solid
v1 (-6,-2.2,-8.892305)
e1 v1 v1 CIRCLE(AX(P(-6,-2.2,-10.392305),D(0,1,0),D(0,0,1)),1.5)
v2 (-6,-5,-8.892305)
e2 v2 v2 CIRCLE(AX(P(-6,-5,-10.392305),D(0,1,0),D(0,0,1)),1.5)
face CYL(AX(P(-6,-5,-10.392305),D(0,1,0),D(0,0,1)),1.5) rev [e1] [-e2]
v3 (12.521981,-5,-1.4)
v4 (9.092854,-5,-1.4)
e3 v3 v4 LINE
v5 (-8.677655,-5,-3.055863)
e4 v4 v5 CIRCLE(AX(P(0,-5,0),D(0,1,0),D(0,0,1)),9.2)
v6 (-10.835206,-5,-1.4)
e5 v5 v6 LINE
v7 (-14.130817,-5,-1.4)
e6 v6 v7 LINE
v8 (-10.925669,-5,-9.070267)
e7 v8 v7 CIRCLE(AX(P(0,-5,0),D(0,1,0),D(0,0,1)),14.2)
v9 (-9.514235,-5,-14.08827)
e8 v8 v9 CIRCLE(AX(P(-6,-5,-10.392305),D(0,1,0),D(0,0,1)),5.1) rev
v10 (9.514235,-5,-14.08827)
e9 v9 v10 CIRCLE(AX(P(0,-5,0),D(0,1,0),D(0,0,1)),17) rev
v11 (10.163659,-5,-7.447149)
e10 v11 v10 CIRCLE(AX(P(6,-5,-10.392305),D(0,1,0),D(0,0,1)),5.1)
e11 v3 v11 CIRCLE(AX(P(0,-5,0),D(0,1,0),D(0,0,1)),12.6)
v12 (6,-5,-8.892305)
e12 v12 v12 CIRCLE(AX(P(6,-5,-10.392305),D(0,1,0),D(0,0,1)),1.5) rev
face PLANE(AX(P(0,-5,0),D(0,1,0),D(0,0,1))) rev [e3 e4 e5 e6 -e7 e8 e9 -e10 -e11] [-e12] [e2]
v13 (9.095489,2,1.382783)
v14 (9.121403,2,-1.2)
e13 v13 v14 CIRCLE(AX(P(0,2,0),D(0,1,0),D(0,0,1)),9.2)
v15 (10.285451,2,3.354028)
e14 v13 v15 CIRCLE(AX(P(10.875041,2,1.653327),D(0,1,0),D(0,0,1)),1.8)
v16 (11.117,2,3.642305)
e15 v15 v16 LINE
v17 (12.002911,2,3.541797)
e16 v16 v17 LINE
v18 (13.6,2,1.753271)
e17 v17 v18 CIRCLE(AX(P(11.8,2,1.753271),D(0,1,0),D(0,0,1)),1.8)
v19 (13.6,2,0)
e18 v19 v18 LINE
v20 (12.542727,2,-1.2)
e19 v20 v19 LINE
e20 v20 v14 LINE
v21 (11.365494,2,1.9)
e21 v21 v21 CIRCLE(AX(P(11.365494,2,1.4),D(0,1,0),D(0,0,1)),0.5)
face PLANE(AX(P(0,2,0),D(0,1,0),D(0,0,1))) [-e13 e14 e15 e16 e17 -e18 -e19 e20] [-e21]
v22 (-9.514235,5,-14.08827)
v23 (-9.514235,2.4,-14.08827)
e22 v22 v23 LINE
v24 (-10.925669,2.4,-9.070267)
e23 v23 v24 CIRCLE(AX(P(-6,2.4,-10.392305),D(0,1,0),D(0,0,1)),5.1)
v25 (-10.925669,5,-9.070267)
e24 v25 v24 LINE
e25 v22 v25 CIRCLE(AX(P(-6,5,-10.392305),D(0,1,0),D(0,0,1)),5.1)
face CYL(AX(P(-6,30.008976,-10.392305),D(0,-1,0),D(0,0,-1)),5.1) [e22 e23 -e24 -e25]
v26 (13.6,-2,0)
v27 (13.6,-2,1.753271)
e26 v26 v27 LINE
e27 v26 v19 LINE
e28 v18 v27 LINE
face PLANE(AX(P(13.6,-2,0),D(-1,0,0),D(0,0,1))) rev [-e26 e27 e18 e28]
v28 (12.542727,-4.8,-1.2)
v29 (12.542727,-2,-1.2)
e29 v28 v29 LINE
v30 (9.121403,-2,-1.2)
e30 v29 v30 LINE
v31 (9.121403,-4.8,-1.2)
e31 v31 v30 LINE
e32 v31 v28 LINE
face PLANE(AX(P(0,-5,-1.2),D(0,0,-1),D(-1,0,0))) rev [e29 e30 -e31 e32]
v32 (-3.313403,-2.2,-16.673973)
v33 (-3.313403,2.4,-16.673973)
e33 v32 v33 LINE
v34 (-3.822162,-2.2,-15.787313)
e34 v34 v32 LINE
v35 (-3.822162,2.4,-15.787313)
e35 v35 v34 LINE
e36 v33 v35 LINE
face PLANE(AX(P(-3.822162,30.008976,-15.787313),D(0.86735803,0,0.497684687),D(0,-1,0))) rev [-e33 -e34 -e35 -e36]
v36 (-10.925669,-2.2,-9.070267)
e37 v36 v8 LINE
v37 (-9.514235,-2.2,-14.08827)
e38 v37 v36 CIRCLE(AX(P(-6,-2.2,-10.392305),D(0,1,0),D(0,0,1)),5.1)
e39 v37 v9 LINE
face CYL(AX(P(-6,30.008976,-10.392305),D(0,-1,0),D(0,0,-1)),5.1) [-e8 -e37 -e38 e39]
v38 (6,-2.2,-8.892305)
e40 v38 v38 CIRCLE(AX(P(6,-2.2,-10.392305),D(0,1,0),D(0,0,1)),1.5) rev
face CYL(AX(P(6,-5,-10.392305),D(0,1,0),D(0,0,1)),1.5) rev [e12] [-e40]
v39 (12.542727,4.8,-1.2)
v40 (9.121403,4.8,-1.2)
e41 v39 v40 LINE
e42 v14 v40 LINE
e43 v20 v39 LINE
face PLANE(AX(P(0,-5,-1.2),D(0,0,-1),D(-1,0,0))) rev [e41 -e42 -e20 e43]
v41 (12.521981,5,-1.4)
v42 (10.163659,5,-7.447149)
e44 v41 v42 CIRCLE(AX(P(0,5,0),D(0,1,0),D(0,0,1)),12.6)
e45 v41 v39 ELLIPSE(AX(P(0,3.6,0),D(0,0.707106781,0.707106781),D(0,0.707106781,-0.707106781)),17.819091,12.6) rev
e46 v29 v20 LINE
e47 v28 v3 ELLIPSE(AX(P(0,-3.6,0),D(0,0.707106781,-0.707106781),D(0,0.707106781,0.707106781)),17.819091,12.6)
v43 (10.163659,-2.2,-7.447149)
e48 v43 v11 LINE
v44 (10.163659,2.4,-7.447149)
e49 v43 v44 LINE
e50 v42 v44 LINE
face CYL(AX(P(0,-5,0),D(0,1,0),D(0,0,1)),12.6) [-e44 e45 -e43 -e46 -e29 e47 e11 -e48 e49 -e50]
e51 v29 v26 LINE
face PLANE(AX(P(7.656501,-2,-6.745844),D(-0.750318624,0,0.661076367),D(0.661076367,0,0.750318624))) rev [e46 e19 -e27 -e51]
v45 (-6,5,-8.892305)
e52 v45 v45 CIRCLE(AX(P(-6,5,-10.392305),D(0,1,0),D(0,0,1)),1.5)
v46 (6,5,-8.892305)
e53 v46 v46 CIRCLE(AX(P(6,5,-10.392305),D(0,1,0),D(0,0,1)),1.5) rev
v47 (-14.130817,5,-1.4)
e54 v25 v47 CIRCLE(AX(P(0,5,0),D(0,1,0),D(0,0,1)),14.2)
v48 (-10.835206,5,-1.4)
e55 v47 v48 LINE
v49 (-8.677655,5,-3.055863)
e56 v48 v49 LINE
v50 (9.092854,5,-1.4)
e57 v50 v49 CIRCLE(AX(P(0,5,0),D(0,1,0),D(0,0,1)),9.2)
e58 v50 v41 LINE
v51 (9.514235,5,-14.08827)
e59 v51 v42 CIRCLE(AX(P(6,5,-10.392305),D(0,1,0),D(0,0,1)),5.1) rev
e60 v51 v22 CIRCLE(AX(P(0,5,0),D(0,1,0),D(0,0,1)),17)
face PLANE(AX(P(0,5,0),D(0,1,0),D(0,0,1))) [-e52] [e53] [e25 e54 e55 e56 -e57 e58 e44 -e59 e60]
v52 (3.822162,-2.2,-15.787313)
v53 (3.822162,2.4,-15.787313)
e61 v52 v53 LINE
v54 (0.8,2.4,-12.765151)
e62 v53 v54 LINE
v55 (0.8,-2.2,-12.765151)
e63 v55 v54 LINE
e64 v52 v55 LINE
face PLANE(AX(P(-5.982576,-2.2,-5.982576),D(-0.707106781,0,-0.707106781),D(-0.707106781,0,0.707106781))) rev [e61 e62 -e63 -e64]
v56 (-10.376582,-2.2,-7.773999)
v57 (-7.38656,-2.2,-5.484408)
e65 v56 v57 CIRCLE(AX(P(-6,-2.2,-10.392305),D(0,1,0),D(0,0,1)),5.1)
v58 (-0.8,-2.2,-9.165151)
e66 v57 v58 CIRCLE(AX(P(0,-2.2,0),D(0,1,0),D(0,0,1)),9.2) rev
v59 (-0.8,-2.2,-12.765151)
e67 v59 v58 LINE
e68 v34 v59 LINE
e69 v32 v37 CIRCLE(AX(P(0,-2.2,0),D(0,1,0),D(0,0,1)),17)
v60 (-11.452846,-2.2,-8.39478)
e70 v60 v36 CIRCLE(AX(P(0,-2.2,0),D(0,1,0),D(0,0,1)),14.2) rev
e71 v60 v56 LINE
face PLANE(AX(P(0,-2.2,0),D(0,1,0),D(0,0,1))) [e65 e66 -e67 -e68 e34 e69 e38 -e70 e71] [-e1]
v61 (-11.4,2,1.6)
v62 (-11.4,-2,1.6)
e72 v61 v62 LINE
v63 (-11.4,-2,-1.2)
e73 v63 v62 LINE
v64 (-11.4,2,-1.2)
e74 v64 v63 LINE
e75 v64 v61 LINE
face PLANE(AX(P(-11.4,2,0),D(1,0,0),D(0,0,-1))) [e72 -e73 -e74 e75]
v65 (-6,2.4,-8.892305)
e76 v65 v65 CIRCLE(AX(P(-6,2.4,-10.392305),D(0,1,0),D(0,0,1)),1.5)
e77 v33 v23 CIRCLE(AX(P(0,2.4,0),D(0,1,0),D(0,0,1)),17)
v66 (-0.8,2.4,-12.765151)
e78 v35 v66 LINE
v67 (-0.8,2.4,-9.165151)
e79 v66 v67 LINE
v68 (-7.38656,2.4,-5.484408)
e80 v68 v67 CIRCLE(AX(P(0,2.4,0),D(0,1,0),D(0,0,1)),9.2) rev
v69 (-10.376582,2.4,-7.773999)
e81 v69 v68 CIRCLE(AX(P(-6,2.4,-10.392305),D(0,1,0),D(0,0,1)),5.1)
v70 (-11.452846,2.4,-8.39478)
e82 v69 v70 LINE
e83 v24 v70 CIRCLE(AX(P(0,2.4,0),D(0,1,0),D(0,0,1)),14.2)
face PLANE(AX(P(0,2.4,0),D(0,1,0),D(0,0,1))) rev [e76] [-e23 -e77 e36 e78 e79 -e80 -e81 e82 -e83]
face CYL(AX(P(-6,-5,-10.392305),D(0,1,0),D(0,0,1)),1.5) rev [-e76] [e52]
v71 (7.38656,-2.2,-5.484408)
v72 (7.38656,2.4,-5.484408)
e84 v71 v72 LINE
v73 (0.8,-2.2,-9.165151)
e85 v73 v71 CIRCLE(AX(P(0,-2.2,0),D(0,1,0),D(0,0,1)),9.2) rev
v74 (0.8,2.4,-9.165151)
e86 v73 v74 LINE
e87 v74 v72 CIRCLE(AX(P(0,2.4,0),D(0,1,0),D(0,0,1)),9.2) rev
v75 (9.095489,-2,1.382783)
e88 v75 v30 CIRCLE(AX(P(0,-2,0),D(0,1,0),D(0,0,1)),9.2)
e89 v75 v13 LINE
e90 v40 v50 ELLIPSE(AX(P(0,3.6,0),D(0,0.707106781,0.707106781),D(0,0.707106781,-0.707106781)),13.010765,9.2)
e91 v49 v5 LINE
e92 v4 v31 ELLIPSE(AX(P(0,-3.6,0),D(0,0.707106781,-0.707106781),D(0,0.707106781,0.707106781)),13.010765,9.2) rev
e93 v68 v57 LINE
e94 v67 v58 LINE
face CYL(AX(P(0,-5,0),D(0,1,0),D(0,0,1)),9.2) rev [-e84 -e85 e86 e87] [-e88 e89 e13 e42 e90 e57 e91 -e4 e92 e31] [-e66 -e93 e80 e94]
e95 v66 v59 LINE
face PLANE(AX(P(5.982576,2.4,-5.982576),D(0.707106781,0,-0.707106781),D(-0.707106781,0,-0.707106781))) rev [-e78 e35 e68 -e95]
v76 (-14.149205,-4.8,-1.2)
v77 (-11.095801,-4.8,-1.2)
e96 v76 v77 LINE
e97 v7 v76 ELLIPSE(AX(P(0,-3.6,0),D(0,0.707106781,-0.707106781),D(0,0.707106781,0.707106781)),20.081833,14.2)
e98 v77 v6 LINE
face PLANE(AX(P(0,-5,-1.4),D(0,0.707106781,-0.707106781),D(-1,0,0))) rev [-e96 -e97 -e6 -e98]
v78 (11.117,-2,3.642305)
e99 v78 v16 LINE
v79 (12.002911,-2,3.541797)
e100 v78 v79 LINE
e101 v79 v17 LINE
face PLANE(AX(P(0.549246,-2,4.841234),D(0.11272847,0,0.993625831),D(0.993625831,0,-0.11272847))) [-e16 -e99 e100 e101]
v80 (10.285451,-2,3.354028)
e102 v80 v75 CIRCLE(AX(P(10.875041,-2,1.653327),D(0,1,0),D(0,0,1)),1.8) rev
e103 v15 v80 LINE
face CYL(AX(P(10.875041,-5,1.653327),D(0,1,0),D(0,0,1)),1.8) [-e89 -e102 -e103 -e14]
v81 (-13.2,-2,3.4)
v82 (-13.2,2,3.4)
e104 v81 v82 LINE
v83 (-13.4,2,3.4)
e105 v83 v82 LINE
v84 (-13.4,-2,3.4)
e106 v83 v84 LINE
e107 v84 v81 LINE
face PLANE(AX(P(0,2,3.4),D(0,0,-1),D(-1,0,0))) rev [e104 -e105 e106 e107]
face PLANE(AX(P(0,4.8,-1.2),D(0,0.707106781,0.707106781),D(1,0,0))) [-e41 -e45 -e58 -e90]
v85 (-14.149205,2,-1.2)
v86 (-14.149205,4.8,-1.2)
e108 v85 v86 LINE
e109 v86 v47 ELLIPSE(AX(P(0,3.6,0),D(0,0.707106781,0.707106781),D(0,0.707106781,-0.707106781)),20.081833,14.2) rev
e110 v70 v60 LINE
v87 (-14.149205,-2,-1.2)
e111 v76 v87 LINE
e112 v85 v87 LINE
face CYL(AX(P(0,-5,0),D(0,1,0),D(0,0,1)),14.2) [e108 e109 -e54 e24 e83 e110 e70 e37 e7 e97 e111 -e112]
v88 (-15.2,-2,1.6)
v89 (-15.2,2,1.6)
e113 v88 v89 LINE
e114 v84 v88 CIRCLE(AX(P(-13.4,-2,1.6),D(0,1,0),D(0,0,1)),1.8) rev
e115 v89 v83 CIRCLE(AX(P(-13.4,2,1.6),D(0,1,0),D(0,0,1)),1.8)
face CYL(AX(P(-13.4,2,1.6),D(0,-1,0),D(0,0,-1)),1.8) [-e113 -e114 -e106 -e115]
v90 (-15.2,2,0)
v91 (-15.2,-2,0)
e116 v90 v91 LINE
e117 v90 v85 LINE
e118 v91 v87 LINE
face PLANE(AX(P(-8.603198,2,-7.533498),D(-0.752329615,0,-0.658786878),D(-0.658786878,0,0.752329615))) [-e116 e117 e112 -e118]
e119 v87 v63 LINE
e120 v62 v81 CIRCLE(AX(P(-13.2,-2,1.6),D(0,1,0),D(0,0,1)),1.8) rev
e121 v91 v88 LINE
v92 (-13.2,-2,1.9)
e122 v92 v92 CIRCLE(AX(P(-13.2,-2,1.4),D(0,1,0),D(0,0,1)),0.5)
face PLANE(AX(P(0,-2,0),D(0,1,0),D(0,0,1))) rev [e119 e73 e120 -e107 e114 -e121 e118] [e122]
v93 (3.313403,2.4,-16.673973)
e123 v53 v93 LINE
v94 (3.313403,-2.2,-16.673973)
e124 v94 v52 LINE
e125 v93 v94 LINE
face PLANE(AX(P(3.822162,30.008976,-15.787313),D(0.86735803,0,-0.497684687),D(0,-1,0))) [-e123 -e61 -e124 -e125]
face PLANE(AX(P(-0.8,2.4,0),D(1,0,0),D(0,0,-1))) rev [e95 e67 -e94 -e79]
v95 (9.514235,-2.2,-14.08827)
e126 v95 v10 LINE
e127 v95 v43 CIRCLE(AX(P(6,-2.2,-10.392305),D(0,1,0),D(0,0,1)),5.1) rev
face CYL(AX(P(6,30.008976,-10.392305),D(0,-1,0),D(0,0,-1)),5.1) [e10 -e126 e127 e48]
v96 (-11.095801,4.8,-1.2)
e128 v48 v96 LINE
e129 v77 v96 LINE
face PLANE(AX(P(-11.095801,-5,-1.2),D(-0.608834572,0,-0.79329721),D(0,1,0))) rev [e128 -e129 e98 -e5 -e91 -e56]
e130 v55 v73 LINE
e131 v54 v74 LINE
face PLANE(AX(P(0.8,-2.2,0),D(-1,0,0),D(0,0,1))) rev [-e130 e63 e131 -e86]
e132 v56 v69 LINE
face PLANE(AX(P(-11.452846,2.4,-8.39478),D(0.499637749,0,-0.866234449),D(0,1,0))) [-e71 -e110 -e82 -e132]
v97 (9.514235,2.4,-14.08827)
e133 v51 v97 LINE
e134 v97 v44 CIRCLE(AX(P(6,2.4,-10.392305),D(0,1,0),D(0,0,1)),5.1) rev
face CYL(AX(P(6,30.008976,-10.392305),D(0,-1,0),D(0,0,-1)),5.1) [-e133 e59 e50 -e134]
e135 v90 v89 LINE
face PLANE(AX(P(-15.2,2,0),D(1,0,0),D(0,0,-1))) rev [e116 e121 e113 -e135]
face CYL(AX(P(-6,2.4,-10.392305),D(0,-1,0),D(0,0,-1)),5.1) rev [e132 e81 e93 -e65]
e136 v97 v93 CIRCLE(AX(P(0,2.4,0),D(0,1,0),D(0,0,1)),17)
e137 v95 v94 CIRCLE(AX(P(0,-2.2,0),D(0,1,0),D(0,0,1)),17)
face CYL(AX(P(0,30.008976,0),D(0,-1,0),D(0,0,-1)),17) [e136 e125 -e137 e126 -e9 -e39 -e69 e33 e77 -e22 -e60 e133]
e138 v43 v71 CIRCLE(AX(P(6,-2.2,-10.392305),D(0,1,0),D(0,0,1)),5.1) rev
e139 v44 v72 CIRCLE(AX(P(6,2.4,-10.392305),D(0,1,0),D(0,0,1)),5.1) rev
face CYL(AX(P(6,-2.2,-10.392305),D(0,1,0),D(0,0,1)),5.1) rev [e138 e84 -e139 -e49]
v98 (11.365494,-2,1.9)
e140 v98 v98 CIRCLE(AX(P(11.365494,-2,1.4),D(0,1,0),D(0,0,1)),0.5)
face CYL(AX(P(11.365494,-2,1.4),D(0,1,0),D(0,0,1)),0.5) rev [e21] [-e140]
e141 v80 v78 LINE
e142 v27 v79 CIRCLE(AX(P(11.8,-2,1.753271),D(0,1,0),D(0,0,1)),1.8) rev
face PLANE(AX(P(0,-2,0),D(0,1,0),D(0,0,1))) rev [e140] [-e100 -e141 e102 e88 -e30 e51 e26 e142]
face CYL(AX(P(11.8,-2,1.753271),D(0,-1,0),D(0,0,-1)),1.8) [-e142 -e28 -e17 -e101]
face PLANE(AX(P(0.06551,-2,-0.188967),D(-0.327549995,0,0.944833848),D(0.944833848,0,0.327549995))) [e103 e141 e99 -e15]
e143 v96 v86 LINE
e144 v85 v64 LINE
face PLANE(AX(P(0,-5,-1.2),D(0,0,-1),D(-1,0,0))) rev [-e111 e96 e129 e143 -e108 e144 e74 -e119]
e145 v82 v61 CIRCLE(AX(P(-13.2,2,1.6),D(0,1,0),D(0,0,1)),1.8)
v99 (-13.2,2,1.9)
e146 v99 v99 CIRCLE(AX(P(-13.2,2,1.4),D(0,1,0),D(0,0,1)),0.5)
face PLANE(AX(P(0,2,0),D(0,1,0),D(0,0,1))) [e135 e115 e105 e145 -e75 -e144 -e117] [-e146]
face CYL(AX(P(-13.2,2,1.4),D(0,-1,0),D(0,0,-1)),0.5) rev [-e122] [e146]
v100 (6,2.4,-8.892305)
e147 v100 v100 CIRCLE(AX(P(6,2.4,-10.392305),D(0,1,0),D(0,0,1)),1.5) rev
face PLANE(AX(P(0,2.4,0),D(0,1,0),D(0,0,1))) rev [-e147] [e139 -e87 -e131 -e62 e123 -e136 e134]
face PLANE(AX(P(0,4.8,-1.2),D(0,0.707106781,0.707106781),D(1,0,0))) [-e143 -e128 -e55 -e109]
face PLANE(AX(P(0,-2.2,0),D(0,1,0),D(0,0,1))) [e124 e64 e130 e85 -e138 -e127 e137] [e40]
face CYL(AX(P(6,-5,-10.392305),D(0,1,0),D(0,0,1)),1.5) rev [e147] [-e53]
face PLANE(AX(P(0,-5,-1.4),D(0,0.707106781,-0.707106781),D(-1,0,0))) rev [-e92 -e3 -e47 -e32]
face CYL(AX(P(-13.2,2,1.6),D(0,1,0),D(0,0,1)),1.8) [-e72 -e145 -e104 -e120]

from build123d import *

# Parameters (mm, degrees)
BOSS_EXTRUDE1_DEPTH      = 5
BOSS_EXTRUDE1_DEPTH_BACK = 5
BOSS_EXTRUDE2_DEPTH      = 2
BOSS_EXTRUDE2_DEPTH_BACK = 2
SKETCH1_3_R              = 0.5
CHAMFER1_SIZE            = 1.974397617
FILLET1_R                = 1.8
CHAMFER2_SIZE            = 0.2
BOSS_EXTRUDE3_START      = -5
BOSS_EXTRUDE3_DEPTH      = 10
CUT_EXTRUDE1_START       = -2.2
CUT_EXTRUDE1_OUTLINE_R   = 1.5
CUT_EXTRUDE1_DEPTH       = 4.6
CUT_EXTRUDE2_DEPTH       = 24.34609175
CUT_EXTRUDE2_DEPTH_BACK  = 24.34609175
SKETCH3_4_R              = 1.5
CHAMFER3_SIZE            = 0.2
CHAMFER4_SIZE            = 0.879093368


with BuildPart() as part:
    # Sketch1 → Boss-Extrude1 (new, two sides: drawn at the far end of the back side and taken through both)
    with BuildSketch(Plane(origin=(0, 0, 0), x_dir=(1, 0, 0), z_dir=(0, 1, 0)).offset(-BOSS_EXTRUDE1_DEPTH_BACK)):
        with BuildLine():
            ThreePointArc((-9.121403401, 1.2), (0, 9.2), (9.121403401, 1.2))
            Line((9.121403401, 1.2), (12.542726976, 1.2))
            ThreePointArc((12.542726976, 1.2), (11.397774814, 5.371287488), (8.909545443, 8.909545443))
            Line((8.909545443, 8.909545443), (7.963837169, 11.756585285))
            ThreePointArc((7.963837169, 11.756585285), (-6.117603026, 12.814637459), (-14.149204925, 1.2))
            Line((-14.149204925, 1.2), (-9.121403401, 1.2))
        make_face()
    extrude(amount=BOSS_EXTRUDE1_DEPTH + BOSS_EXTRUDE1_DEPTH_BACK)

    # Sketch1<3> → Boss-Extrude2 (add, two sides: drawn at the far end of the back side and taken through both)
    # profile 1 of 2: a face of its own
    with BuildSketch(Plane(origin=(0, 0, 0), x_dir=(1, 0, 0), z_dir=(0, 1, 0)).offset(-BOSS_EXTRUDE2_DEPTH_BACK)):
        Polygon((-11.4, -3.4), (-11.4, 1.2), (-14.149204925, 1.2), (-15.2, 0), (-15.2, -3.4), align=None)
        with Locations(Location((-13.2, -1.4, 0), (0, 0, 270))):
            Circle(SKETCH1_3_R, mode=Mode.SUBTRACT)
    # profile 2 of 2: a face of its own
    with BuildSketch(Plane(origin=(0, 0, 0), x_dir=(1, 0, 0), z_dir=(0, 1, 0)).offset(-BOSS_EXTRUDE2_DEPTH_BACK)):
        with BuildLine():
            ThreePointArc((9.121403401, 1.2), (9.162283589, -0.832201557), (8.755927173, -2.823781036))
            Line((8.755927173, -2.823781036), (11.11699974, -3.64230517))
            Line((11.11699974, -3.64230517), (13.6, -3.360604742))
            Line((13.6, -3.360604742), (13.6, 0))
            Line((13.6, 0), (12.542726976, 1.2))
            Line((12.542726976, 1.2), (9.121403401, 1.2))
        make_face()
        with Locations(Location((11.365493645, -1.4, 0), (0, 0, 270))):
            Circle(SKETCH1_3_R, mode=Mode.SUBTRACT)
    extrude(amount=BOSS_EXTRUDE2_DEPTH + BOSS_EXTRUDE2_DEPTH_BACK)

    # Chamfer1
    # the kernel refuses this chamfer: 1.974397617, 1.7 mm, written as the material it takes off along each edge
    with BuildSketch(Plane(origin=(-9.121403401, -10.094040977, -1.2), x_dir=(-1, 0, 0), z_dir=(0, 1, 0))) as chamfer1_piece_1:
        with BuildLine():
            Line((CHAMFER1_SIZE, 0), (-0.443747976, -1.855862617))
            ThreePointArc((-0.443747976, -1.855862617), (-0.180868647, -0.969524905), (0, 0))
            Line((0, 0), (CHAMFER1_SIZE, 0))
        make_face()
    extrude(amount=20.188081954, mode=Mode.SUBTRACT)

    # Fillet1
    fillet1_edges = [part.edges().sort_by_distance(p)[0] for p in [
        (8.755927173, 0, 2.823781036),
        (13.6, 0, 3.360604742),
        (-15.2, 0, 3.4),
        (-11.4, 0, 3.4),
    ]]
    fillet(fillet1_edges, radius=FILLET1_R)

    # Chamfer2
    chamfer2_edges = [part.edges().sort_by_distance(p)[0] for p in [
        (10.832065189, 5, -1.2),
        (-12.622502971, 5, -1.2),
    ]]
    chamfer(chamfer2_edges, length=CHAMFER2_SIZE)

    # Boss-Extrude3: read off the stored shape, not the designer's step
    # Boss-Extrude3 outline → Boss-Extrude3 (add)
    with BuildSketch(Plane(origin=(0, 0, 0), x_dir=(1, 0, 0), z_dir=(0, 1, 0)).offset(BOSS_EXTRUDE3_START)):
        with BuildLine():
            ThreePointArc((10.163659229, 7.447149191), (11.075788932, 10.888658263), (9.514234502, 14.088269654))
            ThreePointArc((9.514234502, 14.088269654), (0, 17), (-9.514234502, 14.088269654))
            ThreePointArc((-9.514234502, 14.088269654), (-10.909488785, 11.773217539), (-10.925669215, 9.070267483))
            ThreePointArc((-10.925669215, 9.070267483), (-1.999296901, 14.058549424), (7.963837169, 11.756585285))
            Line((7.963837169, 11.756585285), (8.909545443, 8.909545443))
            ThreePointArc((8.909545443, 8.909545443), (9.564592768, 8.202351199), (10.163659229, 7.447149191))
        make_face()
    extrude(amount=BOSS_EXTRUDE3_DEPTH)

    # Cut-Extrude1: read off the stored shape, not the designer's step
    # Cut-Extrude1 outline → Cut-Extrude1 (cut)
    # profile 1 of 2: a face of its own
    with BuildSketch(Plane(origin=(0, 0, 0), x_dir=(1, 0, 0), z_dir=(0, 1, 0)).offset(CUT_EXTRUDE1_START)):
        with BuildLine():
            ThreePointArc((-10.925669215, 9.070267483), (-9.629828713, 6.809799644), (-7.386560009, 5.484408011))
            ThreePointArc((-7.386560009, 5.484408011), (-4.487973836, 8.031070342), (-0.8, 9.16515139))
            Line((-0.8, 9.16515139), (-0.8, 12.76515139))
            Line((-0.8, 12.76515139), (-4.443774964, 16.408926353))
            ThreePointArc((-4.443774964, 16.408926353), (-7.074805223, 15.457914835), (-9.514234502, 14.088269654))
            ThreePointArc((-9.514234502, 14.088269654), (-10.909488785, 11.773217539), (-10.925669215, 9.070267483))
        make_face()
        with Locations((-6, 10.392304845)):
            Circle(CUT_EXTRUDE1_OUTLINE_R, mode=Mode.SUBTRACT)
    # profile 2 of 2: a face of its own
    with BuildSketch(Plane(origin=(0, 0, 0), x_dir=(1, 0, 0), z_dir=(0, 1, 0)).offset(CUT_EXTRUDE1_START)):
        with BuildLine():
            Line((0.8, 12.76515139), (0.8, 9.16515139))
            ThreePointArc((0.8, 9.16515139), (4.487973836, 8.031070342), (7.386560009, 5.484408011))
            ThreePointArc((7.386560009, 5.484408011), (8.943521978, 6.22749052), (10.163659229, 7.447149191))
            ThreePointArc((10.163659229, 7.447149191), (11.075788932, 10.888658263), (9.514234502, 14.088269654))
            ThreePointArc((9.514234502, 14.088269654), (7.074805223, 15.457914835), (4.443774964, 16.408926353))
            Line((4.443774964, 16.408926353), (0.8, 12.76515139))
        make_face()
        with Locations((6, 10.392304845)):
            Circle(CUT_EXTRUDE1_OUTLINE_R, mode=Mode.SUBTRACT)
    extrude(amount=CUT_EXTRUDE1_DEPTH, mode=Mode.SUBTRACT)

    # Sketch3<4> (on Top Plane) → Cut-Extrude2 (cut, two sides: drawn at the far end of the back side and taken through both)
    with BuildSketch(Plane(origin=(0, 0, 0), x_dir=(1, 0, 0), z_dir=(0, 1, 0)).offset(-CUT_EXTRUDE2_DEPTH_BACK)):
        with Locations(Location((-6, 10.392304845, 0), (0, 0, 270))):
            Circle(SKETCH3_4_R)
        with Locations(Location((6, 10.392304845, 0), (0, 0, 270))):
            Circle(SKETCH3_4_R)
    extrude(amount=CUT_EXTRUDE2_DEPTH + CUT_EXTRUDE2_DEPTH_BACK, mode=Mode.SUBTRACT)

    # Chamfer3
    chamfer3_edges = [part.edges().sort_by_distance(p)[0] for p in [
        (10.832065189, -5, -1.2),
        (-12.622502971, -5, -1.2),
    ]]
    chamfer(chamfer3_edges, length=CHAMFER3_SIZE)

    # Chamfer4
    # the kernel refuses this chamfer: 1.2, 0.879093368, 0.860893535 mm, written as the material it takes off along each edge
    with BuildSketch(Plane(origin=(-10.925669215, -2.2, -9.070267483), x_dir=(0.39004090041873263, 0, 0.9207975325773544), z_dir=(0, 1, 0))) as chamfer4_piece_1:
        with BuildLine():
            Line((1.40776743, 0), (0.416367157, -0.748890719))
            ThreePointArc((0.416367157, -0.748890719), (0.204153797, -0.380499927), (0, 0))
            ThreePointArc((0, 0), (0.723274519, -0.048770435), (1.40776743, 0))
        make_face()
    extrude(amount=4.6, mode=Mode.SUBTRACT)
    with BuildSketch(Plane(origin=(4.443774964, -2.2, -16.408926353), x_dir=(-0.9735942522545705, 0, -0.22828541779286665), z_dir=(0, 1, 0))) as chamfer4_piece_2:
        with BuildLine():
            Line((1.16103032, 0), (CHAMFER4_SIZE * 0.527012931132, CHAMFER4_SIZE * 0.849857264932))
            Line((CHAMFER4_SIZE * 0.527012931132, CHAMFER4_SIZE * 0.849857264932), (0, 0))
            ThreePointArc((0, 0), (0.596888963, -0.009906707), (1.16103032, 0))
        make_face()
    extrude(amount=4.6, mode=Mode.SUBTRACT)
    with BuildSketch(Plane(origin=(-4.443774964, -2.2, -16.408926353), x_dir=(0.9735942522545713, 0, -0.22828541779286343), z_dir=(0, 1, 0))) as chamfer4_piece_3:
        with BuildLine():
            Line((1.16103032, 0), (CHAMFER4_SIZE * 0.527012931132, -CHAMFER4_SIZE * 0.849857264932))
            Line((CHAMFER4_SIZE * 0.527012931132, -CHAMFER4_SIZE * 0.849857264932), (0, 0))
            ThreePointArc((0, 0), (0.596888963, 0.009906707), (1.16103032, 0))
        make_face()
    extrude(amount=4.6, mode=Mode.SUBTRACT)


solid = part.part
